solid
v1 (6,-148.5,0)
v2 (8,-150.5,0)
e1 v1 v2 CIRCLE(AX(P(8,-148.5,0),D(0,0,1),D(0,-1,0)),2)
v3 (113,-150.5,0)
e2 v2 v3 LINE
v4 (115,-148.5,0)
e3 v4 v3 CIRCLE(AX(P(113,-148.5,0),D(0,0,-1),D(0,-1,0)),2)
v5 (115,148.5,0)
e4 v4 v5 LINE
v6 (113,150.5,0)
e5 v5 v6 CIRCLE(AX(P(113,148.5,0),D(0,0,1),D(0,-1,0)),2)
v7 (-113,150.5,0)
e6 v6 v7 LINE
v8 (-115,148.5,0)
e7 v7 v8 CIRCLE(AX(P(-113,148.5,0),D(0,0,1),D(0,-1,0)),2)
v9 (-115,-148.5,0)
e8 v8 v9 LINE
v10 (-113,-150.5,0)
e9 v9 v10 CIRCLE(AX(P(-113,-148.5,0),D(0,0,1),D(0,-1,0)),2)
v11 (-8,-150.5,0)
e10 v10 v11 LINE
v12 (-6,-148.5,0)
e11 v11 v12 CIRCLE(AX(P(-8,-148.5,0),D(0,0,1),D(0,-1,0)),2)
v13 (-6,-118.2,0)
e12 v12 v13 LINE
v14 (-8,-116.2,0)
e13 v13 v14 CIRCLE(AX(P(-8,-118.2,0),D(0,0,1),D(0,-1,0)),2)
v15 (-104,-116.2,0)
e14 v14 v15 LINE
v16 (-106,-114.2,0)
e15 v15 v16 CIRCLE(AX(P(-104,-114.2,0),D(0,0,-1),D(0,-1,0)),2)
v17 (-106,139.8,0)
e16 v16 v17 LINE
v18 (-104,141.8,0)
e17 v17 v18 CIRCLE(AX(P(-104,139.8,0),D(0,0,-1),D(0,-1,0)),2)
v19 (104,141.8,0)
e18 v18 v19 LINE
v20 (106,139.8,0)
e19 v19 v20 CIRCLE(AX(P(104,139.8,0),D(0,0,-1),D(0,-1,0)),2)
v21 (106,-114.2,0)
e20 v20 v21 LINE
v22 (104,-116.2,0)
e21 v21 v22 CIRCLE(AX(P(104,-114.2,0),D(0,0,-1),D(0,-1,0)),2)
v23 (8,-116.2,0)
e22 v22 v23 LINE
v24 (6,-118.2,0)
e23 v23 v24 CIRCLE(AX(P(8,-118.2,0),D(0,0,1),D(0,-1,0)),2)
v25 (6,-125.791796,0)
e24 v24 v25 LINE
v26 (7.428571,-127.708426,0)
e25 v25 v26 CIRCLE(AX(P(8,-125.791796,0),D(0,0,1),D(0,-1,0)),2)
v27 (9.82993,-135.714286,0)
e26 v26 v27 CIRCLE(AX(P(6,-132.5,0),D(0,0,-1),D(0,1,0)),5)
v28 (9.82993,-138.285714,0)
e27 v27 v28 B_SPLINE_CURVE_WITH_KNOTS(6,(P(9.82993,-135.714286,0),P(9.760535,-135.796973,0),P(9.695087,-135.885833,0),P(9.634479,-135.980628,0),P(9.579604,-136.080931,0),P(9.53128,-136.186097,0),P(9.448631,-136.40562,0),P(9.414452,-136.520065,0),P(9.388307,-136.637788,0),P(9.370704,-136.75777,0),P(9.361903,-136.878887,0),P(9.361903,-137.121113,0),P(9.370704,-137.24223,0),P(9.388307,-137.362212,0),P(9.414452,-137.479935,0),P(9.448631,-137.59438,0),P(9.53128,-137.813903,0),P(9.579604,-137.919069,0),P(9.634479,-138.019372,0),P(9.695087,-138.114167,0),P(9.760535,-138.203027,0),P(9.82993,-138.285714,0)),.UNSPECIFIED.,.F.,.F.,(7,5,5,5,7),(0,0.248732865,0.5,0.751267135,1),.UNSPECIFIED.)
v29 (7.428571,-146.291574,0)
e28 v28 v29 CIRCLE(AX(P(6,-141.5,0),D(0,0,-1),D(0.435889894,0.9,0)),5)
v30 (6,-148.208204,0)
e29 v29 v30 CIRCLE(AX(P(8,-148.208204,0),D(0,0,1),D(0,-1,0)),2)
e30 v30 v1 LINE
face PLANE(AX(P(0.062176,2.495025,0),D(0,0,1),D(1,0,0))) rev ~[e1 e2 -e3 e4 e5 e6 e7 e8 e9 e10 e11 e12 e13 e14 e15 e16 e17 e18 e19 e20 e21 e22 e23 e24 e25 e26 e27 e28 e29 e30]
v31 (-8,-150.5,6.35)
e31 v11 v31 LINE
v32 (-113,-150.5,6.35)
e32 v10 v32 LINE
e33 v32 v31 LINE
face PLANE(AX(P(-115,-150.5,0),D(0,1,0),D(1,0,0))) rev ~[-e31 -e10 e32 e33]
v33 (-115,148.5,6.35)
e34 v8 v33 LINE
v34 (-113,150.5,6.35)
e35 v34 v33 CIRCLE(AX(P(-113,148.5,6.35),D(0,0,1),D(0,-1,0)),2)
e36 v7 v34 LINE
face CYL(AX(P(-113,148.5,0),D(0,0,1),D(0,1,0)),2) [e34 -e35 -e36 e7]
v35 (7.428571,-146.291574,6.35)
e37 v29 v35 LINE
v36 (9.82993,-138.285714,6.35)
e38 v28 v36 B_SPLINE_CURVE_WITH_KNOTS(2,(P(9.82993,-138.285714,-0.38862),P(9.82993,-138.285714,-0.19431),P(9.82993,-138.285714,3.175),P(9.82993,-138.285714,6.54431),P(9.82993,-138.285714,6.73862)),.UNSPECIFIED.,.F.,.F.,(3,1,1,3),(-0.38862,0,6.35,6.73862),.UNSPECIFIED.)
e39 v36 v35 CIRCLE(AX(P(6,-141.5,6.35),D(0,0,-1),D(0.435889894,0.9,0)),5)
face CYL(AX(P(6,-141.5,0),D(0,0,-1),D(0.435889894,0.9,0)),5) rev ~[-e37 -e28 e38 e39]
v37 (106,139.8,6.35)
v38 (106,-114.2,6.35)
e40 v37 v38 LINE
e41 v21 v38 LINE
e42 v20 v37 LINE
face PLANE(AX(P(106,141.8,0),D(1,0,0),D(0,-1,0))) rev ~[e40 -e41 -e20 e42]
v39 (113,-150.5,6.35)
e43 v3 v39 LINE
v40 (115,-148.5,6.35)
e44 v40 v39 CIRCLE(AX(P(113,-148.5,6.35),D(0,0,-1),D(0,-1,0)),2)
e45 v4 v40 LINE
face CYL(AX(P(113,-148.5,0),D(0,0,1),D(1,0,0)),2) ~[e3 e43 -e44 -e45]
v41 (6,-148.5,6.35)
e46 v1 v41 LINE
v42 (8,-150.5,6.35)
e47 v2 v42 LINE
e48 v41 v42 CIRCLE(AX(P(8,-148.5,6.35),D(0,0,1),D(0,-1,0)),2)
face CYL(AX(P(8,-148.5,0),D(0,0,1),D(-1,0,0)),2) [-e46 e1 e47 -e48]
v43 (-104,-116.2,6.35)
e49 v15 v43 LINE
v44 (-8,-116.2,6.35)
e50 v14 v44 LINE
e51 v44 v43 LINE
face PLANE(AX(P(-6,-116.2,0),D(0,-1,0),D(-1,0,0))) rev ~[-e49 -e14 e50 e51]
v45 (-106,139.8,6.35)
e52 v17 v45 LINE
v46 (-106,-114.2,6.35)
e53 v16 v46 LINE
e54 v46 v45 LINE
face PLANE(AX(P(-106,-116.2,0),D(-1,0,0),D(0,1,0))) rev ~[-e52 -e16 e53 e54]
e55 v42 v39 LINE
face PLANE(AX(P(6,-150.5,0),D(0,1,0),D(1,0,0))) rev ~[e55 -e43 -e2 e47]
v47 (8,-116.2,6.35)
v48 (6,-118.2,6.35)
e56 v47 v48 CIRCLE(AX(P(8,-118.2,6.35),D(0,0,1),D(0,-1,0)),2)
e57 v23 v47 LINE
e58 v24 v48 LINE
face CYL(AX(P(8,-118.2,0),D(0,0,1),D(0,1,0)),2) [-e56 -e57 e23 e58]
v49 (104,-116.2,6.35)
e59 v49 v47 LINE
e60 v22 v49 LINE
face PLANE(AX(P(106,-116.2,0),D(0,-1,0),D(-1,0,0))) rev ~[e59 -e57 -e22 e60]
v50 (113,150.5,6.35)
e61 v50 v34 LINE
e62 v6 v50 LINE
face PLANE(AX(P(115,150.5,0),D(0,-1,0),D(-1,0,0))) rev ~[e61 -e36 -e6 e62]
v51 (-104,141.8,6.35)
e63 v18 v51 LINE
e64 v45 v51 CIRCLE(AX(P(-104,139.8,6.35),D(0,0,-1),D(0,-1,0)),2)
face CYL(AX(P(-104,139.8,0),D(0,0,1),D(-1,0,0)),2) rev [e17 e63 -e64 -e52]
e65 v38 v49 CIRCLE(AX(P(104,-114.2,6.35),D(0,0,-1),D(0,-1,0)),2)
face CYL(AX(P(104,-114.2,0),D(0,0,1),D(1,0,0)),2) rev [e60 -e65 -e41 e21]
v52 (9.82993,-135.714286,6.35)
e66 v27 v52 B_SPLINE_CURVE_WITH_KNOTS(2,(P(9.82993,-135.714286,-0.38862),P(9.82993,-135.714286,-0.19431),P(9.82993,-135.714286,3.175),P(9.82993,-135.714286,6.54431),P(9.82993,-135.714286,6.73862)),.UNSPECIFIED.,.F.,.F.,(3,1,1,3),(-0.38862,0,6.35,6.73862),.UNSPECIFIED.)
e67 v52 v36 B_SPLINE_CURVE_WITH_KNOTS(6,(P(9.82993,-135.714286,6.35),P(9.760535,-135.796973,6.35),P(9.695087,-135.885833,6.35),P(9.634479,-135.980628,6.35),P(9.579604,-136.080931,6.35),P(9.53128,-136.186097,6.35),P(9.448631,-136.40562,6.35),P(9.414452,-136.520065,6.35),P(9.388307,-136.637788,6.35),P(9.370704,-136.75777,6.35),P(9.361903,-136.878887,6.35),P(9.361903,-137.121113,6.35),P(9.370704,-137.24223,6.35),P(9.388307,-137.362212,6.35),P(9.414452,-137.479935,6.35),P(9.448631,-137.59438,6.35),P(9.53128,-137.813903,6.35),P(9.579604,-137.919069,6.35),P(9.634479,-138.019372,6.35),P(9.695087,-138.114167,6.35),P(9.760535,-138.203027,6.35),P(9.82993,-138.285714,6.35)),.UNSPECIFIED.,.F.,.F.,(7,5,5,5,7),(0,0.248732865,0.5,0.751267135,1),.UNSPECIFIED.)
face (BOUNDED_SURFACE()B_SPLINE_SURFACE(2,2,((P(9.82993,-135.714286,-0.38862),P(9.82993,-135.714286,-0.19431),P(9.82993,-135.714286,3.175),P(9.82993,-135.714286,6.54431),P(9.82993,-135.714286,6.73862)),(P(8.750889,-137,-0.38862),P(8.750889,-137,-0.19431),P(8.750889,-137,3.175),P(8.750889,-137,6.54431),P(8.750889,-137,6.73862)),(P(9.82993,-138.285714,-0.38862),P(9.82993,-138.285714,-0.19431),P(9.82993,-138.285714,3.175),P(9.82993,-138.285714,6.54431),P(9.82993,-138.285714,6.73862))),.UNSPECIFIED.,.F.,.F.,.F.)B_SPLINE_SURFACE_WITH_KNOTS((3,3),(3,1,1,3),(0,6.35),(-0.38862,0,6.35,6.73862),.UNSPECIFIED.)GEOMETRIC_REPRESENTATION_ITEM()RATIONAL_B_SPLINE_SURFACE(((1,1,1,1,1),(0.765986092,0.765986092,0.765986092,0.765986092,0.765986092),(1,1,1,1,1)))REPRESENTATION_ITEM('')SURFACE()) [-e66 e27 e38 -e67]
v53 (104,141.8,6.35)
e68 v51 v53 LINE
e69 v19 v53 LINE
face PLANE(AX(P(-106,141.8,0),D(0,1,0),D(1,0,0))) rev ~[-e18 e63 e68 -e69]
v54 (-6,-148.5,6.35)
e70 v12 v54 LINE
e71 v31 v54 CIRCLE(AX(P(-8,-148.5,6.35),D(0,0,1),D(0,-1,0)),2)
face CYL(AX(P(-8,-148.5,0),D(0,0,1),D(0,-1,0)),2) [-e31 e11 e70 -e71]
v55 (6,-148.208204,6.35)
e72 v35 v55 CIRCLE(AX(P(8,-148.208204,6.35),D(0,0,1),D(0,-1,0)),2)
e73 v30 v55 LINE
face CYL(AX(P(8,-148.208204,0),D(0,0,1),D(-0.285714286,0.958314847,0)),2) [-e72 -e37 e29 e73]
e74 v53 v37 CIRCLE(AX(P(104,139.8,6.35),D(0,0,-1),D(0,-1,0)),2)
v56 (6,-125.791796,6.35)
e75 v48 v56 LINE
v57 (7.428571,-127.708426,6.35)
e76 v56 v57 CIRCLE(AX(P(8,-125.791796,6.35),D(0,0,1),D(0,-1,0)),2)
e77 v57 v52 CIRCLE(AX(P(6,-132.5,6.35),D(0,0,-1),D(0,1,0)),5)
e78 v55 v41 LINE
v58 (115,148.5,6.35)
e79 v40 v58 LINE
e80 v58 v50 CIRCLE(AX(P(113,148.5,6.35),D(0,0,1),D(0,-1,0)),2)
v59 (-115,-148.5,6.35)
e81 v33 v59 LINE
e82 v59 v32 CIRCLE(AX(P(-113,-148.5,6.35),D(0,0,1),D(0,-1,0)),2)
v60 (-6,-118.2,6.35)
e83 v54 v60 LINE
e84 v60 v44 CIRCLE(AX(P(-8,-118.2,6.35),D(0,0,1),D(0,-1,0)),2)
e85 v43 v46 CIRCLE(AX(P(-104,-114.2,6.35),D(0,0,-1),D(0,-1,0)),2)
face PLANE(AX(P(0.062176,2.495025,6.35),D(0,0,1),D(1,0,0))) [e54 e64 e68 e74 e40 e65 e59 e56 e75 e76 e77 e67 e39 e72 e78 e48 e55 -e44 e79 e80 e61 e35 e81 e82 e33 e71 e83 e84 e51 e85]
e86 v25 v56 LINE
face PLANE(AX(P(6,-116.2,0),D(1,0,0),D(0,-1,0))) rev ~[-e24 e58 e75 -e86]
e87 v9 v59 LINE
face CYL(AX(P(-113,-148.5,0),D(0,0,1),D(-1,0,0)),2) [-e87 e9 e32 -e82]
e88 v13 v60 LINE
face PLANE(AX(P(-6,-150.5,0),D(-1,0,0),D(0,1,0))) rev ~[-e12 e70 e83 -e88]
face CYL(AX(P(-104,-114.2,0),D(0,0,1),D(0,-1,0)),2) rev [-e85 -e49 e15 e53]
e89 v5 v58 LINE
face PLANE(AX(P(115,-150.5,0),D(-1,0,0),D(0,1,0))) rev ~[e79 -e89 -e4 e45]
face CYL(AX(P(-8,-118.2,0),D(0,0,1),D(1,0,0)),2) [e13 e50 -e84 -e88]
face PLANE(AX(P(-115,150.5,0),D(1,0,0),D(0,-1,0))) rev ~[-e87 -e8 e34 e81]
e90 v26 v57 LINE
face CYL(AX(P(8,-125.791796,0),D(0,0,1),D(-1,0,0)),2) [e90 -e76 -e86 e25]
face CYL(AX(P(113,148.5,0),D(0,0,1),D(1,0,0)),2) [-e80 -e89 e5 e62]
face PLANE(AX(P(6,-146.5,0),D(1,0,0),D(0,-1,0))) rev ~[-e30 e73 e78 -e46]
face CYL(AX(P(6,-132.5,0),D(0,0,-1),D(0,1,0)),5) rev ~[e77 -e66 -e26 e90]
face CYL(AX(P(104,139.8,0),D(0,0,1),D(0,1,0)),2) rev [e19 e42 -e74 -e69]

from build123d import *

# Parameters (mm, degrees)
F1_DEPTH = 6.35
F2_R     = 2


# Not quite as in the source:
# - a length typed as a fraction of an inch, garbled in the dataset ("3 / 203.2 mm" for 3/8 in), is restored


with BuildPart() as f1:
    # F0 (on Top) → F1 (new body)
    with BuildSketch(Plane.XY):
        with BuildLine():
            Line((115, -150.5), (115, 150.5))
            Line((115, 150.5), (-115, 150.5))
            Line((-115, 150.5), (-115, -150.5))
            Line((-115, -150.5), (-6, -150.5))
            Line((-6, -150.5), (-6, -116.2))
            Line((-6, -116.2), (-106, -116.2))
            Line((-106, -116.2), (-106, 141.8))
            Line((-106, 141.8), (106, 141.8))
            Line((106, 141.8), (106, -116.2))
            Line((106, -116.2), (6, -116.2))
            Line((6, -116.2), (6, -127.5))
            ThreePointArc((6, -127.5), (10.8733971724, -131.3819660113), (8.1794494718, -137))
            ThreePointArc((8.1794494718, -137), (10.8733971724, -142.6180339887), (6, -146.5))
            Line((6, -146.5), (6, -150.5))
            Line((6, -150.5), (115, -150.5))
        make_face()
    extrude(amount=F1_DEPTH)

    # F2
    f2_edges = [f1.edges().sort_by_distance(p)[0] for p in [
        (115, -150.5, 3.175),
        (115, 150.5, 3.175),
        (6, -116.2, 3.175),
        (-6, -116.2, 3.175),
        (-6, -150.5, 3.175),
        (-106, -116.2, 3.175),
        (-115, 150.5, 3.175),
        (6, -127.5, 3.175),
        (8.179449, -137, 3.175),
        (6, -146.5, 3.175),
        (-115, -150.5, 3.175),
        (106, 141.8, 3.175),
        (106, -116.2, 3.175),
        (-106, 141.8, 3.175),
        (6, -150.5, 3.175),
    ]]
    fillet(f2_edges, radius=F2_R)


solid = f1.part
